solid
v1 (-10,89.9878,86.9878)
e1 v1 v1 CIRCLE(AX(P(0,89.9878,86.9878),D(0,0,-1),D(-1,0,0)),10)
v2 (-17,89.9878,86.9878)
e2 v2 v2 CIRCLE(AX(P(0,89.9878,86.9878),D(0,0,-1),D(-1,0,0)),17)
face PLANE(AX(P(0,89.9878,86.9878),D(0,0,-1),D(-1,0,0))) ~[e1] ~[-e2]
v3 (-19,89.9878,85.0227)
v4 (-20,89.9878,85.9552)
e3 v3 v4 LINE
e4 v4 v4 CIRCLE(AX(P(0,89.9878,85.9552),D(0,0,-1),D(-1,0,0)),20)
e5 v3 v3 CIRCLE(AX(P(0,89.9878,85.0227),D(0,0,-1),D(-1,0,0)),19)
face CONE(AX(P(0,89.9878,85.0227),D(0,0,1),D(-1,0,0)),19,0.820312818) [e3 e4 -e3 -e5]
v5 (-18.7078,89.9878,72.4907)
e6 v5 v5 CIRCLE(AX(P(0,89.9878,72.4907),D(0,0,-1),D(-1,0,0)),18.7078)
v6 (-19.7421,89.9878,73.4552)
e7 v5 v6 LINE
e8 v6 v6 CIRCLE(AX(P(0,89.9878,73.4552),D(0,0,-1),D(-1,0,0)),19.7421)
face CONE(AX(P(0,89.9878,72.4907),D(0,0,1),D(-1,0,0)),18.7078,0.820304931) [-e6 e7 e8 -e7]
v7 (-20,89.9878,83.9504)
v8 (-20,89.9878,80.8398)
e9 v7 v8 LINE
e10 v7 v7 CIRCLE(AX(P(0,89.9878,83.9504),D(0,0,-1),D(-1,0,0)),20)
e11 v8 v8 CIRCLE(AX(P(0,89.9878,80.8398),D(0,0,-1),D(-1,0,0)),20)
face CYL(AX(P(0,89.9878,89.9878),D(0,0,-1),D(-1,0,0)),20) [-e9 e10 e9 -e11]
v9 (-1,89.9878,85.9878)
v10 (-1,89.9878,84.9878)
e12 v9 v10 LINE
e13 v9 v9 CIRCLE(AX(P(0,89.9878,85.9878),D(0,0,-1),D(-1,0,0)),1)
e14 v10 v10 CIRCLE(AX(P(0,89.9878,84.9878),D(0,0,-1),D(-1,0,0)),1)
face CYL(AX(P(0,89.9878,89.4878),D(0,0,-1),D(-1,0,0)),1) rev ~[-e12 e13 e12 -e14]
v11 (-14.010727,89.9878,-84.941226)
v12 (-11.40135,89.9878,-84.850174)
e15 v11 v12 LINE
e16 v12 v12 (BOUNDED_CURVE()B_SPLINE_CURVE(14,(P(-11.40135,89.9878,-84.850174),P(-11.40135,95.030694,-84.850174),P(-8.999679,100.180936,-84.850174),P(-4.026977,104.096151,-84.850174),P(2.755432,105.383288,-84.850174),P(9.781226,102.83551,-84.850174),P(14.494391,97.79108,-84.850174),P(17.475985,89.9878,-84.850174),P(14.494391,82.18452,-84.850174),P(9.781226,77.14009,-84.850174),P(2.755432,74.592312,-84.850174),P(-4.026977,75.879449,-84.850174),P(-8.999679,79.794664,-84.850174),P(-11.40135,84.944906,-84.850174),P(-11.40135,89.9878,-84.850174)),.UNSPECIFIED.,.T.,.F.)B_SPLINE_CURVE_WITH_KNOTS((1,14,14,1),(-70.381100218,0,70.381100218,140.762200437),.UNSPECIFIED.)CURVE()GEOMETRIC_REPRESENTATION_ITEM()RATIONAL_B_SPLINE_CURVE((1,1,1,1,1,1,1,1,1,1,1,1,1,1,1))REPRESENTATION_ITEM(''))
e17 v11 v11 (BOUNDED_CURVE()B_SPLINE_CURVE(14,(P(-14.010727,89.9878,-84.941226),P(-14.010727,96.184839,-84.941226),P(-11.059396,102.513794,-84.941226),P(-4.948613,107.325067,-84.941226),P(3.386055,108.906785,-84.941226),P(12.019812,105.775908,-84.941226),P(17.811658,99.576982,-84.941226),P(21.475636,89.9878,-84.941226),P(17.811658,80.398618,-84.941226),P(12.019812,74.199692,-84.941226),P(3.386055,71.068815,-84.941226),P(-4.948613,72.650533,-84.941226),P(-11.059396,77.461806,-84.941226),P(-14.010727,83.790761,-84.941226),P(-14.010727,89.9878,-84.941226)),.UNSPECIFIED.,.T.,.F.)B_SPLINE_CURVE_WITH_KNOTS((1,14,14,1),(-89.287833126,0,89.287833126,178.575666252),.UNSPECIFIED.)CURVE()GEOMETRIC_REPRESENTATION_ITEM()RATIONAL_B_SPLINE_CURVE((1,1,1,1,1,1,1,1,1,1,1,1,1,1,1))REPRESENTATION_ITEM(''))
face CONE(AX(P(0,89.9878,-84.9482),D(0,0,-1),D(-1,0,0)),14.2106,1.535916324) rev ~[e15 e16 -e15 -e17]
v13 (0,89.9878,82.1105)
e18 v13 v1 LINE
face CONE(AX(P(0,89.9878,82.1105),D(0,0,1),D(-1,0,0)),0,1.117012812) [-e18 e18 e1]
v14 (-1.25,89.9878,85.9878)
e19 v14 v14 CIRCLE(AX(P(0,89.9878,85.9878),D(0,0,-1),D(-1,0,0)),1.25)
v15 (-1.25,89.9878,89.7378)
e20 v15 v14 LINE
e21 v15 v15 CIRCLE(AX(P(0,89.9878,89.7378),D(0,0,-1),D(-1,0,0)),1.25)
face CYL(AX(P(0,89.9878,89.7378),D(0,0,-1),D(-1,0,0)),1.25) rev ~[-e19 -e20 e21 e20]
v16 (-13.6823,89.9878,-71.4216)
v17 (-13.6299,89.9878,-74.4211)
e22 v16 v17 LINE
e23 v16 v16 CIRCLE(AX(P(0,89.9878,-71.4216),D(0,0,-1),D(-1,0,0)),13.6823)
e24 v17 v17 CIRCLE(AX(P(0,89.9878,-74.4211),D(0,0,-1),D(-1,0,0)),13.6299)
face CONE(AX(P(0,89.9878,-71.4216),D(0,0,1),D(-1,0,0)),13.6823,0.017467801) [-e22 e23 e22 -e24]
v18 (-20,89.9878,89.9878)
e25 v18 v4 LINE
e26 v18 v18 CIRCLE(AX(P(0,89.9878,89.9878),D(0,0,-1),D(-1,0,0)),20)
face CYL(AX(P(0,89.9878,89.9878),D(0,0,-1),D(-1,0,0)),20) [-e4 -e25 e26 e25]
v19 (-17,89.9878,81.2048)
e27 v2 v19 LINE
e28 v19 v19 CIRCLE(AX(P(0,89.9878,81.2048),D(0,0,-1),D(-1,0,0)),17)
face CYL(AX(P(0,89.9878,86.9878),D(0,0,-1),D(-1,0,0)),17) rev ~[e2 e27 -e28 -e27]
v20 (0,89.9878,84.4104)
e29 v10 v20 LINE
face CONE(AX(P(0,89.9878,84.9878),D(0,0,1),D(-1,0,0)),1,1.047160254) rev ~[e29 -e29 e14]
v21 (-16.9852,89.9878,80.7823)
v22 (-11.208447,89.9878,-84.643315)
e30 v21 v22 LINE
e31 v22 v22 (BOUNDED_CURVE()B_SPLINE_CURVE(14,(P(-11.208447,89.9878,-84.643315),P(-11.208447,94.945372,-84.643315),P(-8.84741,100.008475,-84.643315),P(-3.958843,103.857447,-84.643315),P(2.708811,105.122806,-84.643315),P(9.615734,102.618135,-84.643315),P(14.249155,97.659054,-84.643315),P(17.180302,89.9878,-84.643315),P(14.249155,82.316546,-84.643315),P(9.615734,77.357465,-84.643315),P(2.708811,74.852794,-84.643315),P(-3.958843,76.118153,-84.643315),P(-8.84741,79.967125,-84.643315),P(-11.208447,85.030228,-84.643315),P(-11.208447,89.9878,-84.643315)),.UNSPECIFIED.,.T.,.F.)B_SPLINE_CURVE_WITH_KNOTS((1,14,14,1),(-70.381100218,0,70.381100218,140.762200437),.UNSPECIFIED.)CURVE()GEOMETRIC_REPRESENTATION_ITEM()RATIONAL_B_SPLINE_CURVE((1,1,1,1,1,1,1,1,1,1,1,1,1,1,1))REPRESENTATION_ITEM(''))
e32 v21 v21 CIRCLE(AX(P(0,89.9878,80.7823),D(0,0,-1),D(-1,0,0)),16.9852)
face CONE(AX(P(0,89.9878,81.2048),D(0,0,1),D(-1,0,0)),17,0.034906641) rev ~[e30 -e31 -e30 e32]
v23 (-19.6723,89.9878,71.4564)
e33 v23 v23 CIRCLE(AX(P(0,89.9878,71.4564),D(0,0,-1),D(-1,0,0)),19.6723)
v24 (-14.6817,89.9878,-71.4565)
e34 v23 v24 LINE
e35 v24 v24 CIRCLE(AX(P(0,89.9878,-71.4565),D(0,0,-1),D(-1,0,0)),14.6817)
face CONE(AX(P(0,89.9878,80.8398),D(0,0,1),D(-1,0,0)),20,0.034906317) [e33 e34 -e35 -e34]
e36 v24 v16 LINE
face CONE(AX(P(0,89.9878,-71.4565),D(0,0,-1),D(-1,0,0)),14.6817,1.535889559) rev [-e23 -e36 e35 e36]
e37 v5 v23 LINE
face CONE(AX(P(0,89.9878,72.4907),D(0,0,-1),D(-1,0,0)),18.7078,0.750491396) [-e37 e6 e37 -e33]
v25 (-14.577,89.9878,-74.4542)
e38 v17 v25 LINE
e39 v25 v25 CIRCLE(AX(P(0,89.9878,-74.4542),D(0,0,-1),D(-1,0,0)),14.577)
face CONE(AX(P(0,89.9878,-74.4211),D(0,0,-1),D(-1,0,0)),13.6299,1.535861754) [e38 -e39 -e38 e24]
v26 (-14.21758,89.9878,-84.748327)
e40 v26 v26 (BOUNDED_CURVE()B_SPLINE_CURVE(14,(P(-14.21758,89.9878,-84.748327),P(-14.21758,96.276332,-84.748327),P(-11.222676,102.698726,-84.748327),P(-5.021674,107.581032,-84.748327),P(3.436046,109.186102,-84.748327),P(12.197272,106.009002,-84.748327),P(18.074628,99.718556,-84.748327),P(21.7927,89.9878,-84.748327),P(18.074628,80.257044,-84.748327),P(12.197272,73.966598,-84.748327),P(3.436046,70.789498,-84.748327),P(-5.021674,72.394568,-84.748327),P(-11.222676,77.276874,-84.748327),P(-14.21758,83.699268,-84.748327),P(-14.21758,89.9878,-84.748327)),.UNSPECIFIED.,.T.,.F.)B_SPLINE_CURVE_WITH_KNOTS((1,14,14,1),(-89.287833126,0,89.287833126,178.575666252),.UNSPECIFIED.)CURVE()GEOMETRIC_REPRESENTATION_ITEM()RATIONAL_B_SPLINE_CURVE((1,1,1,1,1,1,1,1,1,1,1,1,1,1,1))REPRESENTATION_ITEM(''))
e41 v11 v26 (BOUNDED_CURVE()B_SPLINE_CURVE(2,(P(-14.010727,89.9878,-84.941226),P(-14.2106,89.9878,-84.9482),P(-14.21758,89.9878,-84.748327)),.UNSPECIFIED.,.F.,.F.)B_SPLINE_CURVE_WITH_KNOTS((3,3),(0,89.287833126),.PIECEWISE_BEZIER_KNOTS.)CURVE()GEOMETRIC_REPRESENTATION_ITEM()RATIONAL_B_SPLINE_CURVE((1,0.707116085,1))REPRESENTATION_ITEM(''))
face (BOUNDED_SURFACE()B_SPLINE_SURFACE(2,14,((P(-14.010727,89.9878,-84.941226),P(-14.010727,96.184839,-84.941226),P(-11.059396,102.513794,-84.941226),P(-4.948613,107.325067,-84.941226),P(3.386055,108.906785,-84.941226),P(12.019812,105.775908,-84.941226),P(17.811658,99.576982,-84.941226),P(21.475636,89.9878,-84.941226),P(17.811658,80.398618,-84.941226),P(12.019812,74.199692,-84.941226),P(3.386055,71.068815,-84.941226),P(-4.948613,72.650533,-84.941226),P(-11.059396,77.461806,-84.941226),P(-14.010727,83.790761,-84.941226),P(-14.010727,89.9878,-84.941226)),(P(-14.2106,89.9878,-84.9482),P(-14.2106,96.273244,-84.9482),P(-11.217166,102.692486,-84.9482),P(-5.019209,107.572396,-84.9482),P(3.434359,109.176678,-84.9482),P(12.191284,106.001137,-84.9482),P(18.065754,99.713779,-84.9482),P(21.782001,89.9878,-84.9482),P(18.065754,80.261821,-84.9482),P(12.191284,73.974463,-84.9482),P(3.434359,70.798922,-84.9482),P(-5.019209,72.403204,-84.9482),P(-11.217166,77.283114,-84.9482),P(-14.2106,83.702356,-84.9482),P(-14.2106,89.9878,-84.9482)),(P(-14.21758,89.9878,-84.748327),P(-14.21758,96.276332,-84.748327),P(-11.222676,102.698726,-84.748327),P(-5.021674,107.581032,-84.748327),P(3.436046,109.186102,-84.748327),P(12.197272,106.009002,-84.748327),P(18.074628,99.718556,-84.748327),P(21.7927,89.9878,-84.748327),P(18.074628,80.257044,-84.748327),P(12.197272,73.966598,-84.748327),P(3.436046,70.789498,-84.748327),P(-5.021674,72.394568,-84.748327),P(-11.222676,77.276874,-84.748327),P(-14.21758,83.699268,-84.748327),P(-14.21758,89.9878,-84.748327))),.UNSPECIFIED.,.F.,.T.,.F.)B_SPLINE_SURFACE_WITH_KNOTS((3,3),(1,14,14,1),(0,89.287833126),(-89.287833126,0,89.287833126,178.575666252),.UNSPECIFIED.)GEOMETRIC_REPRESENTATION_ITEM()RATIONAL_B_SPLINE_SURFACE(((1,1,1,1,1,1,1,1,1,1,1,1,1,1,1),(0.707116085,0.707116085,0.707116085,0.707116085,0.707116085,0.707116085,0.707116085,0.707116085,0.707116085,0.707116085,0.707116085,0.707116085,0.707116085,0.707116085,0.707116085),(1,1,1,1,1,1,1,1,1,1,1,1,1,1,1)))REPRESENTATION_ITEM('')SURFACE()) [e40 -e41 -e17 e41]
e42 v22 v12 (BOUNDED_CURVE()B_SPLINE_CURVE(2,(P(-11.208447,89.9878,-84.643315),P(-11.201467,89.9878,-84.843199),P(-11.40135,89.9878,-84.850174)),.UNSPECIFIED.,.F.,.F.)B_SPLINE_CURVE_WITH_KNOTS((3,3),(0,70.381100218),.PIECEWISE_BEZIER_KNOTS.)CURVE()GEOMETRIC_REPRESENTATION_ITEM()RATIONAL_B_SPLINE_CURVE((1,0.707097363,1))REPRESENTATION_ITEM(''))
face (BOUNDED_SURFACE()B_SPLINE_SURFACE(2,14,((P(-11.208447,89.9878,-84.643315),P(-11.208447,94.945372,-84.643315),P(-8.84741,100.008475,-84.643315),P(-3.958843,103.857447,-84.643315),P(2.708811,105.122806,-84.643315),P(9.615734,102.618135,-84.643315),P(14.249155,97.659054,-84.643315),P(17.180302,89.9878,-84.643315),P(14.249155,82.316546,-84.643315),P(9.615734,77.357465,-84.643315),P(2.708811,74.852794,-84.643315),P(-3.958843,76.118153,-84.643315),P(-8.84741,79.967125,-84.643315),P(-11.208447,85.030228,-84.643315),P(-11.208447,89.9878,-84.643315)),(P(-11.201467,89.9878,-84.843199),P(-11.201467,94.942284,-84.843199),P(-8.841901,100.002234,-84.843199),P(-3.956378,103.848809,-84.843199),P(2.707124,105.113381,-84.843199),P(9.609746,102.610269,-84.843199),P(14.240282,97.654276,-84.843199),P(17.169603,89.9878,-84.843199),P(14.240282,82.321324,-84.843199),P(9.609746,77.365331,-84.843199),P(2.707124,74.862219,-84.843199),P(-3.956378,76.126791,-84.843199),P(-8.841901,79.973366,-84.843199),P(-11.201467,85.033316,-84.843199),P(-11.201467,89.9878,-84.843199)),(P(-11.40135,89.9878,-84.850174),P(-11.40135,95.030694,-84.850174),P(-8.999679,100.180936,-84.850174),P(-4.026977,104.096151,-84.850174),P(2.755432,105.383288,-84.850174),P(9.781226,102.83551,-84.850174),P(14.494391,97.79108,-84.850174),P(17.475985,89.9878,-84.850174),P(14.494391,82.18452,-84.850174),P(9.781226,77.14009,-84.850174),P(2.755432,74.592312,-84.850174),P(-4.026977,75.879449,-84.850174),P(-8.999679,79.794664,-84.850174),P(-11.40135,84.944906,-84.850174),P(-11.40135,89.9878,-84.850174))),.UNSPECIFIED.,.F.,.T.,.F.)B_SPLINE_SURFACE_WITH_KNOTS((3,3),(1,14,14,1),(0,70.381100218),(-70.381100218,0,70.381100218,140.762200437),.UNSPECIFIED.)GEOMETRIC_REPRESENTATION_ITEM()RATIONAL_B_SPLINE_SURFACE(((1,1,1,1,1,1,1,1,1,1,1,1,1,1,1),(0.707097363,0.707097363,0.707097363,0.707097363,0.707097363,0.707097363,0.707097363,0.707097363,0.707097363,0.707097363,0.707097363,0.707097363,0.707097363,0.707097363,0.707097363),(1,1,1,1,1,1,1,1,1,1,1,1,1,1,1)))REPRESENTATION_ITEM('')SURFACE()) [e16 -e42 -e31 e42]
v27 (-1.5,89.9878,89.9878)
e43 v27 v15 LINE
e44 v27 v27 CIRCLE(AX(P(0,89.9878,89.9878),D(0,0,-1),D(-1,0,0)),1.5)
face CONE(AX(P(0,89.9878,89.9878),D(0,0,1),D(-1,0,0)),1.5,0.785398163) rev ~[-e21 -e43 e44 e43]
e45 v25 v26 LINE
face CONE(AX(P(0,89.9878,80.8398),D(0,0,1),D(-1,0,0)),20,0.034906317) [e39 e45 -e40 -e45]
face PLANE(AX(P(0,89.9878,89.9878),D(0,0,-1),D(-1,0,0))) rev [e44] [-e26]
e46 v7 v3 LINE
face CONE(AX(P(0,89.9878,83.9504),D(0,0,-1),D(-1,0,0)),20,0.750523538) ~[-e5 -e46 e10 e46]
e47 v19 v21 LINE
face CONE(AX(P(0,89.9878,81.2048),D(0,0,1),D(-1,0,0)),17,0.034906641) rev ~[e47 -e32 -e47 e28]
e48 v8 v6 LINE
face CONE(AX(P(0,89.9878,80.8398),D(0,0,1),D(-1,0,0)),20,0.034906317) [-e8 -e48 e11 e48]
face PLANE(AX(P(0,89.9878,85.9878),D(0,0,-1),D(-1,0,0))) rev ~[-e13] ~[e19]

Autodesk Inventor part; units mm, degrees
ref_plane "YZ Plane" through (0, 0, 0) normal (1, 0, 0) x (0, 1, 0)
ref_plane "XZ Plane" through (0, 0, 0) normal (0, 1, 0) x (-1, 0, 0)
ref_plane "XY Plane" through (0, 0, 0) normal (0, 0, 1) x (1, 0, 0)
sketch "Sketch1" plane through (0, 0, 0) normal (1, 0, 0) x (0, 1, 0)
  line L0 (-20, 0) -> (174.936, 0)
  line L1 (0, 0) -> (0, -20)
  line L2 (0, -20) -> (9.148, -20)
  line L3 (9.148, -20) -> (174.936, -14.2106)
  line L4 (174.936, 0) -> (174.936, -14.2106)
  line L5 (3, -10) -> (3, -17)
  line L6 (7.8773, 0) -> (3, -10)
  line L7 (7.8773, 0) -> (19.0033, 0) construction
  line L8 (9.2055, 0) -> (9.2055, -16.9852)
  line L9 (8.783, -17) -> (174.936, -11.1978)
  line L10 (3, -17) -> (8.783, -17)
  line L11 (174.936, -14.2106) -> (174.831, -11.2015)
  line L12 (6.0374, -20) -> (4.9651, -19)
  line L13 (4.9651, -19) -> (4.0326, -20)
  line L14 (4.9651, -19) -> (5, -20)
  line L15 (17.532, -19.7072) -> (17.4971, -18.7078)
  line L16 (17.4971, -18.7078) -> (18.5314, -19.6723)
  line L17 (17.4971, -18.7078) -> (16.5326, -19.7421)
  line L18 (164.442, -14.577) -> (161.4443, -14.6817)
  line L19 (161.4443, -14.6817) -> (161.4094, -13.6823)
  line L20 (161.4094, -13.6823) -> (164.4089, -13.6299)
  line L21 (164.4089, -13.6299) -> (164.442, -14.577)
  line L22 (0.5, 0) -> (0.5, -1)
  line L23 (0, -1.5) -> (0.5, -1)
  line L24 (0.5, -1) -> (5, -1)
  line L25 (5, -1) -> (5.5774, 0)
  line L26 (0.25, -1.25) -> (4, -1.25)
  line L27 (4, -1.25) -> (4, 0)
  point P0 (4, -1)
  dimension "d1" = 20
  dimension "d5" = 3
  dimension "d18" = 90
  dimension "d22" = 5
  dimension "d23" = 1
  dimension "d24" = 1
  dimension "d25" = 157.5
  dimension "d26" = 3
  dimension "d27" = 1
  dimension "d28" = 13.5
  dimension "d43" = 88
  dimension "d45" = 17
revolve "Revolution1" add sketch "Sketch1" angle 360 about axis through (0, -20, 0) along (0, 1, 0) contours L23 L26 L27 L24 L25 L0 L6 L5 L10 L9 L11 L3 L21 L20 L19 L16 L17 L2 L12 L13 L1
fillet "Fillet1" radius 0.2 2 edges at (0, 174.936, 14.2106) (0, 174.831, 11.2015)
thread "Thread2" size "M2.5x0.45" class "6H" standard "ANSI Metric M Profile" length 3.5
move or copy body "Поворот1" bodies to move or copy 1 copy no rotation origin (0, 0, 0) rotation axis (0, 0, 1) rotation angle -90 translate (-89.9878, 89.9878, 0)
move or copy body "Поворот2" bodies to move or copy 1 copy no rotation origin (0, 0, 0) rotation axis (0, 1, 0) rotation angle 90
properties material "Aluminum 2014-T6"
